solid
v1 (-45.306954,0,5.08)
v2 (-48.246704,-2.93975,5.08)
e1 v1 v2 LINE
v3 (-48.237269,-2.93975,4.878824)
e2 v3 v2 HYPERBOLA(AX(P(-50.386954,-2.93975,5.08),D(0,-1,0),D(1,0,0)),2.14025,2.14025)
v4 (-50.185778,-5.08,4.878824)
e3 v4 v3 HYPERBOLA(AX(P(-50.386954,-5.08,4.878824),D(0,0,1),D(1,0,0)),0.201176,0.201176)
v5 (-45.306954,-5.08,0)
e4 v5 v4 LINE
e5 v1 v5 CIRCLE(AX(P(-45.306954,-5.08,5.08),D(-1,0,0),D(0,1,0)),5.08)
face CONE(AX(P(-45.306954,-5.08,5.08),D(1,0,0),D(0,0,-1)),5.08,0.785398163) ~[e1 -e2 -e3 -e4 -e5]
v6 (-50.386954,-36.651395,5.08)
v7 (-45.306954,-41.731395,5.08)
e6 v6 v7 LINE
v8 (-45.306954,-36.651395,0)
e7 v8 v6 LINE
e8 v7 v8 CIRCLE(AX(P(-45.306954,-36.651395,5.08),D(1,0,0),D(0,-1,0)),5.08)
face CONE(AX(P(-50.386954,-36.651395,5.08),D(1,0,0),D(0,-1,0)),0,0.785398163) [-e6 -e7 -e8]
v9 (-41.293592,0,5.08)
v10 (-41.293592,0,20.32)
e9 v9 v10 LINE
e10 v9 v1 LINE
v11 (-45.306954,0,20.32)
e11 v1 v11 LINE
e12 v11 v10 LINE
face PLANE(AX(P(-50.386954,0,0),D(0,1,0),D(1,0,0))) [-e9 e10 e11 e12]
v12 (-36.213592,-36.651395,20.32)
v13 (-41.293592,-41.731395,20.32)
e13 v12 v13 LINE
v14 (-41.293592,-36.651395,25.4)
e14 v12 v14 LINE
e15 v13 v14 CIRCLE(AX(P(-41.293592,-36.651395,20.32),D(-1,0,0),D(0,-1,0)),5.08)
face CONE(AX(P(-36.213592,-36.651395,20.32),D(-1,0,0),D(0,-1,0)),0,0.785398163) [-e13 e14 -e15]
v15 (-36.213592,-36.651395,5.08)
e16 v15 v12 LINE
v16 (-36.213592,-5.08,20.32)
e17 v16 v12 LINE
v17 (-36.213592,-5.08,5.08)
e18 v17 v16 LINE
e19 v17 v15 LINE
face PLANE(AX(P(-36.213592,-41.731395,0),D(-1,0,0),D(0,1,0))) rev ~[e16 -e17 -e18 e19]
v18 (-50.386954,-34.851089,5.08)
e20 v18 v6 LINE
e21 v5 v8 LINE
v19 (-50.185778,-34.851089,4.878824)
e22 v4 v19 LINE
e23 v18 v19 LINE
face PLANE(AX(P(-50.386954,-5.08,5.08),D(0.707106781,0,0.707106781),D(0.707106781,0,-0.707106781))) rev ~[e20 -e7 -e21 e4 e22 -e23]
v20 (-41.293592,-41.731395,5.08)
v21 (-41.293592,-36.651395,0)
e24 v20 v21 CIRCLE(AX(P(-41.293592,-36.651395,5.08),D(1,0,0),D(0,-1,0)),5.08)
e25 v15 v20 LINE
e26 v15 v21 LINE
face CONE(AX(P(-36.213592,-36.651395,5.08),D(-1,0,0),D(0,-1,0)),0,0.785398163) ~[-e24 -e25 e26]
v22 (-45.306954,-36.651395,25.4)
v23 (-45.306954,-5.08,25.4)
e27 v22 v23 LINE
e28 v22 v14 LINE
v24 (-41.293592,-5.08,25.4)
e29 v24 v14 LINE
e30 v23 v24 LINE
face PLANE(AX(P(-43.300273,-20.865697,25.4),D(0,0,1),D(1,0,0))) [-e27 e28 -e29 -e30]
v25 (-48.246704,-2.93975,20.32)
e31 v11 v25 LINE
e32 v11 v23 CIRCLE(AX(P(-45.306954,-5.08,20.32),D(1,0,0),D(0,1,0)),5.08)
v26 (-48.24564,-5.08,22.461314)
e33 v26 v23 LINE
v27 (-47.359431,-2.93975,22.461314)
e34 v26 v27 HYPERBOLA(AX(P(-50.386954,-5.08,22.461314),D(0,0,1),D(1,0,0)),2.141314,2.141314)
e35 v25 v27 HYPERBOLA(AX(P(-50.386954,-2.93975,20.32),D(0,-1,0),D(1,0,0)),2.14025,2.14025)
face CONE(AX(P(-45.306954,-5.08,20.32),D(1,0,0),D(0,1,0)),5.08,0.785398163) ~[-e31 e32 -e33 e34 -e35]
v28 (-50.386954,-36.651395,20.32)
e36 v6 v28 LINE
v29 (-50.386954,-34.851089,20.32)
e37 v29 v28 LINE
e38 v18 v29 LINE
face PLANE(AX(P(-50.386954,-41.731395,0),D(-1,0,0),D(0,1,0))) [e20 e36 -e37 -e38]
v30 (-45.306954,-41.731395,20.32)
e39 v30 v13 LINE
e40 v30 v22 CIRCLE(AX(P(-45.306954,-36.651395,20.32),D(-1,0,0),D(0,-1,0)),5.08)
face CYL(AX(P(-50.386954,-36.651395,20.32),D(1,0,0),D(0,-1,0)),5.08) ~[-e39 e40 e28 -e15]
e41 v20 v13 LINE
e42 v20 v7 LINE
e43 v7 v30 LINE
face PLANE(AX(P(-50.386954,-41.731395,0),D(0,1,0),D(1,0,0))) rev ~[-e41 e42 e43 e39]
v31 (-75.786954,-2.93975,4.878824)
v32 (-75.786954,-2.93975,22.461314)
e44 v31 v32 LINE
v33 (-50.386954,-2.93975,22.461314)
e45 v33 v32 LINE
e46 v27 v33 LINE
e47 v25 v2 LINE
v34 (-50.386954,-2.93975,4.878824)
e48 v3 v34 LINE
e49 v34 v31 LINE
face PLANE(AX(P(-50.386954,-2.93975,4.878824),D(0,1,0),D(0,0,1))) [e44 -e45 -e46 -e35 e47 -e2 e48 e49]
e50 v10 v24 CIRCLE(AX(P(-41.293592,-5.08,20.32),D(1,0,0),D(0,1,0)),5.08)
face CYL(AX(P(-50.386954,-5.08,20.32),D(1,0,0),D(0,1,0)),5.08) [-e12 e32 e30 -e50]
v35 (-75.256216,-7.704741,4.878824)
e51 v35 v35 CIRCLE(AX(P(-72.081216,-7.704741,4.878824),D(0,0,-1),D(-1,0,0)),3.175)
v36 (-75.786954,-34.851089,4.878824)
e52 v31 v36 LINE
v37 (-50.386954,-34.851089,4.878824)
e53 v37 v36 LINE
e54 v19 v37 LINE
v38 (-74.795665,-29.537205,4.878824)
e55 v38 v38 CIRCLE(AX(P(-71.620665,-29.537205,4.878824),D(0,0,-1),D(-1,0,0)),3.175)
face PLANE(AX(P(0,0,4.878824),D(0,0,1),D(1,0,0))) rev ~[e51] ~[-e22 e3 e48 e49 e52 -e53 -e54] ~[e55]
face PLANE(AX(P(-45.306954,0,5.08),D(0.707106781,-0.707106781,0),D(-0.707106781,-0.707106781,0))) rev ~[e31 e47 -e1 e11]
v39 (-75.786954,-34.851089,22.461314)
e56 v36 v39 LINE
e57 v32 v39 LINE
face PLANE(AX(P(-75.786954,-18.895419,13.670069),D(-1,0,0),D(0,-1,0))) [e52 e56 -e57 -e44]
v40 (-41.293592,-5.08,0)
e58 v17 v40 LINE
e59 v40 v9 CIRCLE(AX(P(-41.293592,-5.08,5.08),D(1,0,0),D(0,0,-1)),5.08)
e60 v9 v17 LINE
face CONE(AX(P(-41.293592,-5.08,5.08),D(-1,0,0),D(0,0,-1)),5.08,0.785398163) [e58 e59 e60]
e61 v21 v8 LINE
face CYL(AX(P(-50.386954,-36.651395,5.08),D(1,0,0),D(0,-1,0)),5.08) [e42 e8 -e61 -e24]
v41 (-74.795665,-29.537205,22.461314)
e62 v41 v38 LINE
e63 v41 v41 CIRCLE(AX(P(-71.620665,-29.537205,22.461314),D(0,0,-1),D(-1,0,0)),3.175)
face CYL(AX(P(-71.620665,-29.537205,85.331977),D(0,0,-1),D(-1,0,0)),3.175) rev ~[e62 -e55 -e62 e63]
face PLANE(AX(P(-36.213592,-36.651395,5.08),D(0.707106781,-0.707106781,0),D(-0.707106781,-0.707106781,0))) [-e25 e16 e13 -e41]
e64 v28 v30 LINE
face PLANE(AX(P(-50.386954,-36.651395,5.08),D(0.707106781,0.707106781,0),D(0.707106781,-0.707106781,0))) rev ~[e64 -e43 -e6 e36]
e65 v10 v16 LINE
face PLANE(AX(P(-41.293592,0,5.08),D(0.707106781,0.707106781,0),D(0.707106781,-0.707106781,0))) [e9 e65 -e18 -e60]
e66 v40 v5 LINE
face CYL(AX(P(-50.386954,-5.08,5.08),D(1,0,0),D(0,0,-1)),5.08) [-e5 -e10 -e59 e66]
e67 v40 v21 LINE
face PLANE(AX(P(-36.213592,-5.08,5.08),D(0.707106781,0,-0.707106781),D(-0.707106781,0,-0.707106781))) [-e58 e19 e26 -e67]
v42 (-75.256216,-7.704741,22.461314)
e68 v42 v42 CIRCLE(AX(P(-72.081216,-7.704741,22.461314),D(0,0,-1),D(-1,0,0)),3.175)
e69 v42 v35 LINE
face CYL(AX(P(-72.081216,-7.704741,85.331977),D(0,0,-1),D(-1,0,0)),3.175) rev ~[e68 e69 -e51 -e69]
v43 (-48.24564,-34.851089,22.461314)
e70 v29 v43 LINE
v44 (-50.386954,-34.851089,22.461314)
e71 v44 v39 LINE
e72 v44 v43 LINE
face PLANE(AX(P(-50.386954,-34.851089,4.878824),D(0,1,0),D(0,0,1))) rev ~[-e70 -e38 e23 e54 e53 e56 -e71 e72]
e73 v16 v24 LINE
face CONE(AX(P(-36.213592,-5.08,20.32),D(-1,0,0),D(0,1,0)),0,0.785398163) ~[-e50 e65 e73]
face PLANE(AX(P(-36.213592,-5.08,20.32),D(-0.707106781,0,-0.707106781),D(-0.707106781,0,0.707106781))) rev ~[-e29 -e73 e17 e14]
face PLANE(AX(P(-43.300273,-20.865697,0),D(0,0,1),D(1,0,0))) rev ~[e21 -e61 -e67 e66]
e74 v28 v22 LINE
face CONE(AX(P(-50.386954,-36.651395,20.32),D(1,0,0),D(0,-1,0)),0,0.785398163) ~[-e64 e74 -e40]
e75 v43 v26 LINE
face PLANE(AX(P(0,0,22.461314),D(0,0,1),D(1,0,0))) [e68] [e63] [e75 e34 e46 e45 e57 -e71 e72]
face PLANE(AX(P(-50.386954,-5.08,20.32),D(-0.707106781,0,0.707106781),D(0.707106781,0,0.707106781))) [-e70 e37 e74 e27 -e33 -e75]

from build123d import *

# Parameters (mm, degrees)
F0_W          = 14.1733624041
F0_H          = 41.7313948274
F1_DEPTH      = 25.4
F2_R          = 5.08
F3_R          = 5.08
F4_R          = 5.08
F5_R          = 5.08
F6_W          = 31.9113396108
F6_H          = 17.5824901089
F7_DEPTH      = 12.7
F8_DEPTH      = 25.4
F10_D         = 6.35
F11_D         = 6.35
F12_T1_DEPTH  = 15.24
F12_T3_DEPTH  = 31.5713948274
F12_T6_ANGLE  = 90
F12_T8_ANGLE  = 90
F12_T10_ANGLE = 90
F12_T12_ANGLE = 90
F12_T14_ANGLE = 90
F12_T18_DEPTH = 31.5713948274
F12_T24_DEPTH = 31.5713948274
F12_T30_DEPTH = 31.5713948274
F12_T36_ANGLE = 90
F12_T42_ANGLE = 90
F12_T48_ANGLE = 90
F12_T54_DEPTH = 15.24
F12_T59_ANGLE = 90
F12_T65_ANGLE = 90
F12_T71_ANGLE = 90
F12_T77_DEPTH = 31.5713948274
F12_T83_DEPTH = 31.5713948274
F12_T89_DEPTH = 31.5713948274
F12_T93_ANGLE = 90


# Not quite as in the source:
# - a fillet or chamfer that OpenCascade refuses, or shapes differently, is made with other operations: its cross-section is extruded or revolved along the edge and cut away or added


with BuildPart() as f1:
    # F0 (on Top) → F1 (new body)
    with BuildSketch(Plane.XY):
        with Locations((-43.3002728969, -20.8656974137)):
            Rectangle(F0_W, F0_H)
    extrude(amount=F1_DEPTH)

    # F2
    f2_edges = [f1.edges().sort_by_distance(p)[0] for p in [
        (-43.300273, -41.731395, 25.4),
    ]]
    fillet(f2_edges, radius=F2_R)

    # F3
    f3_edges = [f1.edges().sort_by_distance(p)[0] for p in [
        (-43.300273, -41.731395, 0),
    ]]
    fillet(f3_edges, radius=F3_R)

    # F4
    f4_edges = [f1.edges().sort_by_distance(p)[0] for p in [
        (-43.300273, 0, 0),
    ]]
    fillet(f4_edges, radius=F4_R)

    # F5
    f5_edges = [f1.edges().sort_by_distance(p)[0] for p in [
        (-43.300273, 0, 25.4),
    ]]
    fillet(f5_edges, radius=F5_R)

    # F1_face (on face) + F6 (on face) → F7 (join)
    with BuildSketch(Plane(origin=(-50.3869540989, -20.8656974137, 12.7), x_dir=(0, -1, 0), z_dir=(-1, 0, 0))):
        with BuildLine():
            Line((-20.8656974137, 7.62), (-20.8656974137, -7.62))
            ThreePointArc((-20.8656974137, -7.62), (-19.3777998621, -11.2121024484), (-15.7856974137, -12.7))
            Line((-15.7856974137, -12.7), (15.7856974137, -12.7))
            ThreePointArc((15.7856974137, -12.7), (19.3777998621, -11.2121024484), (20.8656974137, -7.62))
            Line((20.8656974137, -7.62), (20.8656974137, 7.62))
            ThreePointArc((20.8656974137, 7.62), (19.3777998621, 11.2121024484), (15.7856974137, 12.7))
            Line((15.7856974137, 12.7), (-15.7856974137, 12.7))
            ThreePointArc((-15.7856974137, 12.7), (-19.3777998621, 11.2121024484), (-20.8656974137, 7.62))
        make_face()
    with BuildSketch(Plane(origin=(-50.3869540989, 0, 0), x_dir=(0, -1, 0), z_dir=(-1, 0, 0))):
        with Locations((18.8954193145, 13.6700686999)):
            Rectangle(F6_W, F6_H)
    extrude(amount=-F7_DEPTH)

    # F6 (on face) → F8 (join)
    with BuildSketch(Plane(origin=(-50.3869540989, 0, 0), x_dir=(0, -1, 0), z_dir=(-1, 0, 0))):
        with Locations((18.8954193145, 13.6700686999)):
            Rectangle(F6_W, F6_H)
    extrude(amount=F8_DEPTH)

    # F10 (through all)
    with Locations(Plane.XY.offset(22.4613137543)):
        with Locations((-71.6206654906, -29.537204653)):
            Hole(F10_D / 2)

    # F11 (through all)
    with Locations(Plane.XY.offset(22.4613137543)):
        with Locations((-72.0812156796, -7.7047413215)):
            Hole(F11_D / 2)

    # F12: chamfer of 5.08 on 4 edges, made by hand

    # F12_s2 → F12_t1 (cut)
    with BuildSketch(Plane.XY.offset(5.08)):
        Polygon((-36.2135916948, -36.6513948274), (-41.2935916948, -41.7313948274), (-36.2135916948, -41.7313948274), align=None)
        Polygon((-41.2935916948, 0), (-36.2135916948, -5.08), (-36.2135916948, 0), align=None)
        Polygon((-50.3869540989, -36.6513948274), (-45.3069540989, -41.7313948274), (-50.3869540989, -41.7313948274), align=None)
    extrude(amount=F12_T1_DEPTH, mode=Mode.SUBTRACT)

    # F12_s4 → F12_t3 (cut)
    with BuildSketch(Plane.XZ.offset(5.08)):
        Polygon((-36.2135916948, 20.32), (-41.2935916948, 25.4), (-36.2135916948, 25.4), align=None)
        Polygon((-36.2135916948, 5.08), (-41.2935916948, 0), (-36.2135916948, 0), align=None)
    extrude(amount=F12_T3_DEPTH, mode=Mode.SUBTRACT)

    # F12_s5 → F12_t6 (revolve, cut)
    with BuildSketch(Plane.XY.offset(20.32)):
        Polygon((-50.3869540989, -36.6513948274), (-45.3069540989, -41.7313948274), (-50.3869540989, -41.7313948274), align=None)
    revolve(axis=Axis((-50.3869540989, -36.6513948274, 20.32), (-1, 0, 0)), revolution_arc=F12_T6_ANGLE, mode=Mode.SUBTRACT)

    # F12_s7 → F12_t8 (revolve, cut)
    with BuildSketch(Plane.XY.offset(20.32)):
        Polygon((-36.2135916948, -36.6513948274), (-41.2935916948, -41.7313948274), (-36.2135916948, -41.7313948274), align=None)
    revolve(axis=Axis((-36.2135916948, -36.6513948274, 20.32), (-1, 0, 0)), revolution_arc=F12_T8_ANGLE, mode=Mode.SUBTRACT)

    # F12_s9 → F12_t10 (revolve, cut)
    with BuildSketch(Plane.XY.offset(20.32)):
        Polygon((-36.2135916948, -5.08), (-41.2935916948, 0), (-36.2135916948, 0), align=None)
    revolve(axis=Axis((-36.2135916948, -5.08, 20.32), (1, 0, 0)), revolution_arc=F12_T10_ANGLE, mode=Mode.SUBTRACT)

    # F12_s11 → F12_t12 (revolve, cut)
    with BuildSketch(Plane.XZ.offset(5.08)):
        Polygon((-41.2935916948, 0), (-36.2135916948, 5.08), (-36.2135916948, 0), align=None)
    revolve(axis=Axis((-36.2135916948, -5.08, 5.08), (1, 0, 0)), revolution_arc=F12_T12_ANGLE, mode=Mode.SUBTRACT)

    # F12_s13 → F12_t14 (revolve, cut)
    with BuildSketch(Plane.XY.offset(5.08)):
        Polygon((-36.2135916948, -36.6513948274), (-41.2935916948, -41.7313948274), (-36.2135916948, -41.7313948274), align=None)
    revolve(axis=Axis((-36.2135916948, -36.6513948274, 5.08), (1, 0, 0)), revolution_arc=F12_T14_ANGLE, mode=Mode.SUBTRACT)


with BuildPart() as f12_tool16:
    # F12_s17 → F12_t18 (new body)
    with BuildSketch(Plane.XZ.offset(5.08)):
        Polygon((-50.3869540989, 20.32), (-45.3069540989, 25.4), (-50.3869540989, 25.4), align=None)
    extrude(amount=F12_T18_DEPTH)

    split(bisect_by=Plane.XY.offset(22.4613137543), keep=Keep.TOP)

    split(bisect_by=Plane.XZ.offset(34.8510891199), keep=Keep.BOTTOM)


with BuildPart() as f1_1:
    add(f1.part)

    # F12_t15: cut F12_tool16
    add(f12_tool16.part, mode=Mode.SUBTRACT)


with BuildPart() as f12_tool22:
    # F12_s23 → F12_t24 (new body)
    with BuildSketch(Plane.XZ.offset(5.08)):
        Polygon((-50.3869540989, 20.32), (-45.3069540989, 25.4), (-50.3869540989, 25.4), align=None)
    extrude(amount=F12_T24_DEPTH)

    split(bisect_by=Plane.XY.offset(22.4613137543), keep=Keep.BOTTOM)

    split(bisect_by=Plane.XZ.offset(34.8510891199), keep=Keep.TOP)


with BuildPart() as f1_2:
    add(f1_1.part)

    # F12_t21: cut F12_tool22
    add(f12_tool22.part, mode=Mode.SUBTRACT)


with BuildPart() as f12_tool28:
    # F12_s29 → F12_t30 (new body)
    with BuildSketch(Plane.XZ.offset(5.08)):
        Polygon((-50.3869540989, 20.32), (-45.3069540989, 25.4), (-50.3869540989, 25.4), align=None)
    extrude(amount=F12_T30_DEPTH)

    split(bisect_by=Plane.XY.offset(22.4613137543), keep=Keep.TOP)

    split(bisect_by=Plane.XZ.offset(34.8510891199), keep=Keep.TOP)


with BuildPart() as f1_3:
    add(f1_2.part)

    # F12_t27: cut F12_tool28
    add(f12_tool28.part, mode=Mode.SUBTRACT)


with BuildPart() as f12_tool34:
    # F12_s35 → F12_t36 (revolve)
    with BuildSketch(Plane.XY.offset(20.32)):
        Polygon((-45.3069540989, 0), (-50.3869540989, -5.08), (-50.3869540989, 0), align=None)
    revolve(axis=Axis((-50.3869540989, -5.08, 20.32), (1, 0, 0)), revolution_arc=F12_T36_ANGLE)

    split(bisect_by=Plane.XZ.offset(2.9397495091), keep=Keep.BOTTOM)

    split(bisect_by=Plane.XY.offset(22.4613137543), keep=Keep.BOTTOM)


with BuildPart() as f1_4:
    add(f1_3.part)

    # F12_t33: cut F12_tool34
    add(f12_tool34.part, mode=Mode.SUBTRACT)


with BuildPart() as f12_tool40:
    # F12_s41 → F12_t42 (revolve)
    with BuildSketch(Plane.XY.offset(20.32)):
        Polygon((-45.3069540989, 0), (-50.3869540989, -5.08), (-50.3869540989, 0), align=None)
    revolve(axis=Axis((-50.3869540989, -5.08, 20.32), (1, 0, 0)), revolution_arc=F12_T42_ANGLE)

    split(bisect_by=Plane.XZ.offset(2.9397495091), keep=Keep.BOTTOM)

    split(bisect_by=Plane.XY.offset(22.4613137543), keep=Keep.TOP)


with BuildPart() as f1_5:
    add(f1_4.part)

    # F12_t39: cut F12_tool40
    add(f12_tool40.part, mode=Mode.SUBTRACT)


with BuildPart() as f12_tool46:
    # F12_s47 → F12_t48 (revolve)
    with BuildSketch(Plane.XY.offset(20.32)):
        Polygon((-45.3069540989, 0), (-50.3869540989, -5.08), (-50.3869540989, 0), align=None)
    revolve(axis=Axis((-50.3869540989, -5.08, 20.32), (1, 0, 0)), revolution_arc=F12_T48_ANGLE)

    split(bisect_by=Plane.XZ.offset(2.9397495091), keep=Keep.TOP)

    split(bisect_by=Plane.XY.offset(22.4613137543), keep=Keep.TOP)


with BuildPart() as f1_6:
    add(f1_5.part)

    # F12_t45: cut F12_tool46
    add(f12_tool46.part, mode=Mode.SUBTRACT)


with BuildPart() as f12_tool52:
    # F12_s53 → F12_t54 (new body)
    with BuildSketch(Plane.XY.offset(5.08)):
        Polygon((-45.3069540989, 0), (-50.3869540989, -5.08), (-50.3869540989, 0), align=None)
    extrude(amount=F12_T54_DEPTH)

    split(bisect_by=Plane.XZ.offset(2.9397495091), keep=Keep.BOTTOM)


with BuildPart() as f1_7:
    add(f1_6.part)

    # F12_t51: cut F12_tool52
    add(f12_tool52.part, mode=Mode.SUBTRACT)


with BuildPart() as f12_tool57:
    # F12_s58 → F12_t59 (revolve)
    with BuildSketch(Plane.XZ.offset(5.08)):
        Polygon((-45.3069540989, 0), (-50.3869540989, 5.08), (-50.3869540989, 0), align=None)
    revolve(axis=Axis((-50.3869540989, -5.08, 5.08), (1, 0, 0)), revolution_arc=F12_T59_ANGLE)

    split(bisect_by=Plane.XZ.offset(2.9397495091), keep=Keep.TOP)

    split(bisect_by=Plane.XY.offset(4.8788236454), keep=Keep.BOTTOM)


with BuildPart() as f1_8:
    add(f1_7.part)

    # F12_t56: cut F12_tool57
    add(f12_tool57.part, mode=Mode.SUBTRACT)


with BuildPart() as f12_tool63:
    # F12_s64 → F12_t65 (revolve)
    with BuildSketch(Plane.XZ.offset(5.08)):
        Polygon((-45.3069540989, 0), (-50.3869540989, 5.08), (-50.3869540989, 0), align=None)
    revolve(axis=Axis((-50.3869540989, -5.08, 5.08), (1, 0, 0)), revolution_arc=F12_T65_ANGLE)

    split(bisect_by=Plane.XZ.offset(2.9397495091), keep=Keep.BOTTOM)

    split(bisect_by=Plane.XY.offset(4.8788236454), keep=Keep.BOTTOM)


with BuildPart() as f1_9:
    add(f1_8.part)

    # F12_t62: cut F12_tool63
    add(f12_tool63.part, mode=Mode.SUBTRACT)


with BuildPart() as f12_tool69:
    # F12_s70 → F12_t71 (revolve)
    with BuildSketch(Plane.XZ.offset(5.08)):
        Polygon((-45.3069540989, 0), (-50.3869540989, 5.08), (-50.3869540989, 0), align=None)
    revolve(axis=Axis((-50.3869540989, -5.08, 5.08), (1, 0, 0)), revolution_arc=F12_T71_ANGLE)

    split(bisect_by=Plane.XZ.offset(2.9397495091), keep=Keep.BOTTOM)

    split(bisect_by=Plane.XY.offset(4.8788236454), keep=Keep.TOP)


with BuildPart() as f1_10:
    add(f1_9.part)

    # F12_t68: cut F12_tool69
    add(f12_tool69.part, mode=Mode.SUBTRACT)


with BuildPart() as f12_tool75:
    # F12_s76 → F12_t77 (new body)
    with BuildSketch(Plane.XZ.offset(5.08)):
        Polygon((-50.3869540989, 5.08), (-45.3069540989, 0), (-50.3869540989, 0), align=None)
    extrude(amount=F12_T77_DEPTH)

    split(bisect_by=Plane.XZ.offset(34.8510891199), keep=Keep.BOTTOM)

    split(bisect_by=Plane.XY.offset(4.8788236454), keep=Keep.BOTTOM)


with BuildPart() as f1_11:
    add(f1_10.part)

    # F12_t74: cut F12_tool75
    add(f12_tool75.part, mode=Mode.SUBTRACT)


with BuildPart() as f12_tool81:
    # F12_s82 → F12_t83 (new body)
    with BuildSketch(Plane.XZ.offset(5.08)):
        Polygon((-50.3869540989, 5.08), (-45.3069540989, 0), (-50.3869540989, 0), align=None)
    extrude(amount=F12_T83_DEPTH)

    split(bisect_by=Plane.XZ.offset(34.8510891199), keep=Keep.TOP)

    split(bisect_by=Plane.XY.offset(4.8788236454), keep=Keep.TOP)


with BuildPart() as f1_12:
    add(f1_11.part)

    # F12_t80: cut F12_tool81
    add(f12_tool81.part, mode=Mode.SUBTRACT)


with BuildPart() as f12_tool87:
    # F12_s88 → F12_t89 (new body)
    with BuildSketch(Plane.XZ.offset(5.08)):
        Polygon((-50.3869540989, 5.08), (-45.3069540989, 0), (-50.3869540989, 0), align=None)
    extrude(amount=F12_T89_DEPTH)

    split(bisect_by=Plane.XZ.offset(34.8510891199), keep=Keep.TOP)

    split(bisect_by=Plane.XY.offset(4.8788236454), keep=Keep.BOTTOM)


with BuildPart() as f1_13:
    add(f1_12.part)

    # F12_t86: cut F12_tool87
    add(f12_tool87.part, mode=Mode.SUBTRACT)

    # F12_s92 → F12_t93 (revolve, cut)
    with BuildSketch(Plane.XY.offset(5.08)):
        Polygon((-50.3869540989, -36.6513948274), (-45.3069540989, -41.7313948274), (-50.3869540989, -41.7313948274), align=None)
    revolve(axis=Axis((-50.3869540989, -36.6513948274, 5.08), (1, 0, 0)), revolution_arc=F12_T93_ANGLE, mode=Mode.SUBTRACT)


solid = f1_13.part
